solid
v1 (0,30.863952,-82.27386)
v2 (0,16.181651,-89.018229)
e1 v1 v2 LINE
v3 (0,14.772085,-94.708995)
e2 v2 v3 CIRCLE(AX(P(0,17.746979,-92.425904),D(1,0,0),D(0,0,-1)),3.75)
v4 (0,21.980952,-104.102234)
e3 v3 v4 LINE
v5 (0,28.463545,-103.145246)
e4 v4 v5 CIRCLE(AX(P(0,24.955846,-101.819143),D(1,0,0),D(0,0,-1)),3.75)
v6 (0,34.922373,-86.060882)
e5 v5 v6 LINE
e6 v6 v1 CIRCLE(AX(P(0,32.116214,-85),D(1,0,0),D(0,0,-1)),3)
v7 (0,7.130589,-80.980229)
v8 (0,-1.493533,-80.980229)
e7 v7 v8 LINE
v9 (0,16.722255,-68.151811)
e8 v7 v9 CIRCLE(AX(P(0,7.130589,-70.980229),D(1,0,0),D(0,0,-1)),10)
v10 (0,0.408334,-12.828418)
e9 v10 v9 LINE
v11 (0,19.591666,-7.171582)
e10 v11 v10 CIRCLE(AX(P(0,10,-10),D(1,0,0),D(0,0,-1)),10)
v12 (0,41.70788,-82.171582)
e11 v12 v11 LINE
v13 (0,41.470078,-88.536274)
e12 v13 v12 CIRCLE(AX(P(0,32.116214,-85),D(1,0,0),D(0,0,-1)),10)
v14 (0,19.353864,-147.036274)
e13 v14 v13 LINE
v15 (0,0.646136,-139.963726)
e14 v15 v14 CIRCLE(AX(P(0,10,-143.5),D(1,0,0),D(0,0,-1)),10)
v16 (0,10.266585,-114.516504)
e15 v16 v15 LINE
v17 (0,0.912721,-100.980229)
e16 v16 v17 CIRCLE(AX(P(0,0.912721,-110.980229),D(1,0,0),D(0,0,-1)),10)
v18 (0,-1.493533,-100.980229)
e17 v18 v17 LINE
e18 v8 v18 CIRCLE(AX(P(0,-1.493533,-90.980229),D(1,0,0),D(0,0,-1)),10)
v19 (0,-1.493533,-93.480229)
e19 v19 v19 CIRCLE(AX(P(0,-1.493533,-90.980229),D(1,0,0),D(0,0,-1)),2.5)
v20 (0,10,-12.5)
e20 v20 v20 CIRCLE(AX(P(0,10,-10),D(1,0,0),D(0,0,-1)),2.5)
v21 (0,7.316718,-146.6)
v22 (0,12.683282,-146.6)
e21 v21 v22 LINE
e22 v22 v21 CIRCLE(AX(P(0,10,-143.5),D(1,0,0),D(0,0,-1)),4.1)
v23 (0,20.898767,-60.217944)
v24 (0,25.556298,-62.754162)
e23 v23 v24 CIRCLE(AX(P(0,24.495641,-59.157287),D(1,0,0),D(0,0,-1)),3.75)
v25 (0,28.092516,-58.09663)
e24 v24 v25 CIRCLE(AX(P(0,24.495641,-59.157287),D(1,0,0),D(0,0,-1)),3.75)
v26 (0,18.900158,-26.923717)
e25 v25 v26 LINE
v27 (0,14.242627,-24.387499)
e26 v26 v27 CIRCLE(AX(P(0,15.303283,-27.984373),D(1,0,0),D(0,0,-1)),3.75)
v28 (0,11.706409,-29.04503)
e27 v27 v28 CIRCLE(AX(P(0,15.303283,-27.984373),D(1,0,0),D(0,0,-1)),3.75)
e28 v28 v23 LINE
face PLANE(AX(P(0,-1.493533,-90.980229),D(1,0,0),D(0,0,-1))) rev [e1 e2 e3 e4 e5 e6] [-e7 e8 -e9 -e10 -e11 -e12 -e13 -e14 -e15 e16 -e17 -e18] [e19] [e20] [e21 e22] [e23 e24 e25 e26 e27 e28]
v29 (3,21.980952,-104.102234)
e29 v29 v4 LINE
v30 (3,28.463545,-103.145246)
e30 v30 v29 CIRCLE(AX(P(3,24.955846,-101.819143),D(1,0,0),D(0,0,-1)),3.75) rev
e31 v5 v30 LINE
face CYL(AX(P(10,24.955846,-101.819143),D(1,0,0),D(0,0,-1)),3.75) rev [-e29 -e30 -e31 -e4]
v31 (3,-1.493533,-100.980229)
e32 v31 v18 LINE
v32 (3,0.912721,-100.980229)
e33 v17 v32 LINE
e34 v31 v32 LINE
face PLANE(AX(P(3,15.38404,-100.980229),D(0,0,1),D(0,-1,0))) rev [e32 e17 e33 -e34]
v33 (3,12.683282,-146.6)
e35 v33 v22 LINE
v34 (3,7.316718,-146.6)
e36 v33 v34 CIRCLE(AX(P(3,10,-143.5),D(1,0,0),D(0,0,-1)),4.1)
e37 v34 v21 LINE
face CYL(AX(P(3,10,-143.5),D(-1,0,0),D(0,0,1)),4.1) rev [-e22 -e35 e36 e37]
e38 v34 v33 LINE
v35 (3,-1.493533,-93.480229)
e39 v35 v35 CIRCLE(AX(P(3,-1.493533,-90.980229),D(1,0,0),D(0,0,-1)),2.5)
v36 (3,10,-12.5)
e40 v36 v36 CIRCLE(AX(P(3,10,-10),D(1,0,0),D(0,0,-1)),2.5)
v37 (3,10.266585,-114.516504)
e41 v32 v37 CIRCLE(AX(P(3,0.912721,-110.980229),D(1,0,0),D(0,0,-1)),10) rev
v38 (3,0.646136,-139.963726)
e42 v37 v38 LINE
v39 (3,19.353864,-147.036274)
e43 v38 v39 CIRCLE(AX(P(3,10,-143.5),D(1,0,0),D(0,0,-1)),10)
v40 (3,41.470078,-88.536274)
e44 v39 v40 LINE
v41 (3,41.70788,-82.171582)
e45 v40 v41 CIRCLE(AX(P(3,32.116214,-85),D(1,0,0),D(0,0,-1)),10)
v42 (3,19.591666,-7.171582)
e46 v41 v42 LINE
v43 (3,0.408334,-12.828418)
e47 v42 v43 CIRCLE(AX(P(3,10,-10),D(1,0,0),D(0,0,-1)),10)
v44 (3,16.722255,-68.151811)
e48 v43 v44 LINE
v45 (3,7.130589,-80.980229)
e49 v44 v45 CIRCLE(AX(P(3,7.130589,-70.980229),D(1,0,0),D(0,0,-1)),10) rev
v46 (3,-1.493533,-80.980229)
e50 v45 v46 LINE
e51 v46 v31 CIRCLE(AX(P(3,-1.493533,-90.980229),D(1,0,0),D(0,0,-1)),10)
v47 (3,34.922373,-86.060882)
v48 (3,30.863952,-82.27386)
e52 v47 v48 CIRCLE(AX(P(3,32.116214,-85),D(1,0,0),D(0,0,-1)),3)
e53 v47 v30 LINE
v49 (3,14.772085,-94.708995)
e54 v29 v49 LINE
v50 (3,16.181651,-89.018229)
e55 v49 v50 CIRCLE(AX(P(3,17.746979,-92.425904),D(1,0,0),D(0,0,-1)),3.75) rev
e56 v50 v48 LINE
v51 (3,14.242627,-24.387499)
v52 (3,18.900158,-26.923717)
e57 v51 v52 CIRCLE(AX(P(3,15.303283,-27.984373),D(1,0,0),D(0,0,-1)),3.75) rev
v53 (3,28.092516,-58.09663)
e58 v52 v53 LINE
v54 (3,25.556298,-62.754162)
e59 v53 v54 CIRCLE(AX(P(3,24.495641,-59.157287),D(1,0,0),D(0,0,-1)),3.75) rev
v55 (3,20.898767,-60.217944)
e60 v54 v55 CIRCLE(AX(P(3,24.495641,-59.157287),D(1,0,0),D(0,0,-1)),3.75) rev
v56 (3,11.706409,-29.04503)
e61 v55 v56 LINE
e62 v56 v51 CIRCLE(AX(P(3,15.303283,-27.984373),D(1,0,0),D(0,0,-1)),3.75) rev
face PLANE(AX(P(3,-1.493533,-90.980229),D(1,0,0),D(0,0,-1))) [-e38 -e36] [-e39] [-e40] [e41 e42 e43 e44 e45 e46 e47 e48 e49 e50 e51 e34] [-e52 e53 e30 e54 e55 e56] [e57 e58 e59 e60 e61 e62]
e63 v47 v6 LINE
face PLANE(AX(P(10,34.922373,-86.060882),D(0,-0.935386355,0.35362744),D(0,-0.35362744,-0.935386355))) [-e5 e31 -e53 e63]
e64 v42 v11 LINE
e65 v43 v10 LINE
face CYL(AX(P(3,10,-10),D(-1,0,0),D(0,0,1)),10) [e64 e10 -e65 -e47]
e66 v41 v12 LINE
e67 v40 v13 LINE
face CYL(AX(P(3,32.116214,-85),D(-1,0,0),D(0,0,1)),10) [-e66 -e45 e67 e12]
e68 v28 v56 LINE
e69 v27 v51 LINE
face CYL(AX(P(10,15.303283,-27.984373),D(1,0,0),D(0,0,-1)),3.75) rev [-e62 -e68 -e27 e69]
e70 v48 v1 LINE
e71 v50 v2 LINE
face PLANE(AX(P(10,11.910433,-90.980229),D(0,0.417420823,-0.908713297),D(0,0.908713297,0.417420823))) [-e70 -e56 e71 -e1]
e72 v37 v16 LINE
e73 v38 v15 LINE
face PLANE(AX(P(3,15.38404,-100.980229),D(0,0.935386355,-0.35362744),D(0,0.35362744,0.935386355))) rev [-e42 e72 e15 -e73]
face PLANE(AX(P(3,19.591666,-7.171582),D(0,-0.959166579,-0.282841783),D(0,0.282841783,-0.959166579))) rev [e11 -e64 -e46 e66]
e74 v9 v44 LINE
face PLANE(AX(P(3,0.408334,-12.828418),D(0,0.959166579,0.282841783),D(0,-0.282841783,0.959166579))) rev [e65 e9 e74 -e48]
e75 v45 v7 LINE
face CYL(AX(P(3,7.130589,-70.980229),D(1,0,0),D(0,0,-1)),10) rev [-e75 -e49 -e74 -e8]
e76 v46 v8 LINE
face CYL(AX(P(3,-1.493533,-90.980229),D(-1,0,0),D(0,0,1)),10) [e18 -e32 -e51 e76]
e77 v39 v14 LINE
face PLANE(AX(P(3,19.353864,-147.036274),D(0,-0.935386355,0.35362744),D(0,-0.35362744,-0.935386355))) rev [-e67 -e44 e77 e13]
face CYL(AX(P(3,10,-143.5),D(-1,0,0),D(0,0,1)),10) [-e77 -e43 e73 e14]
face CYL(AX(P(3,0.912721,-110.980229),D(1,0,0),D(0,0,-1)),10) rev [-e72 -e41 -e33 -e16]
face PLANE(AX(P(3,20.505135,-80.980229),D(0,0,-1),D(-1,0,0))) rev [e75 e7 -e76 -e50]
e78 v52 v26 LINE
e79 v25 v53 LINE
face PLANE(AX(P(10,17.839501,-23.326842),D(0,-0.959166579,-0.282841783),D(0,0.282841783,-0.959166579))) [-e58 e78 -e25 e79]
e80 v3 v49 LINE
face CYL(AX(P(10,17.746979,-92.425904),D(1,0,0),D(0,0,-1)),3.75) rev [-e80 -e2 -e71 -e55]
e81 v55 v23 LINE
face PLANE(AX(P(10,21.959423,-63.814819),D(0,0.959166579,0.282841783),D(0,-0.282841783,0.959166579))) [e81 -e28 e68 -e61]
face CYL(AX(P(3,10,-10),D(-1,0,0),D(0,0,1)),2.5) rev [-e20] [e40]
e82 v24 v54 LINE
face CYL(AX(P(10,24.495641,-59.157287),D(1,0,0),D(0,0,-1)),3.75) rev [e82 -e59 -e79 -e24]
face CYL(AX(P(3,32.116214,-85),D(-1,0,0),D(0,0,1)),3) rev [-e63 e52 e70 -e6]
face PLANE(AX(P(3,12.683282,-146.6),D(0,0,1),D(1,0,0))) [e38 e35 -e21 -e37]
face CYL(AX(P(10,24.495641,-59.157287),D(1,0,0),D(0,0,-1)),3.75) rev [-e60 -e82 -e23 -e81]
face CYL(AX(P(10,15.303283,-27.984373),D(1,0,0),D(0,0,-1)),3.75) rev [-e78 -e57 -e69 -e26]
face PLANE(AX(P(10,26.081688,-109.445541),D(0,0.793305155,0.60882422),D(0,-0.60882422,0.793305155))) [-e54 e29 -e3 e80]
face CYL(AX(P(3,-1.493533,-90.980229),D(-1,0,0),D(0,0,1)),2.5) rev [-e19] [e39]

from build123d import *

# Parameters (mm, degrees)
SKETCH3_R           = 3
SKETCH3_R_2         = 2.5
BOSS_EXTRUDE2_DEPTH = 3
FILLET1_R           = 10
CUT_EXTRUDE1_DEPTH  = 10
FILLET2_R           = 3.75


with BuildPart() as part:
    # Sketch3 → Boss-Extrude2 (new body)
    with BuildSketch(Plane(origin=(0, 0, 0), x_dir=(0, 0, -1), z_dir=(1, 0, 0))):
        with BuildLine():
            Line((7.171582169, 19.591665787), (82.171582169, 41.707880218))
            ThreePointArc((82.171582169, 41.707880218), (85.373366716, 42.109241865), (88.536274395, 41.470077986))
            Line((88.536274395, 41.470077986), (147.036274395, 19.353863555))
            ThreePointArc((147.036274395, 19.353863555), (152.853863555, 6.463725605), (139.963725605, 0.646136445))
            Line((139.963725605, 0.646136445), (100.980229255, 15.384040113))
            Line((100.980229255, 15.384040113), (100.980229255, -1.493532665))
            ThreePointArc((100.980229255, -1.493532665), (90.980229255, -11.493532665), (80.980229255, -1.493532665))
            Line((80.980229255, -1.493532665), (80.980229255, 20.505135217))
            Line((80.980229255, 20.505135217), (12.828417831, 0.408334213))
            ThreePointArc((12.828417831, 0.408334213), (0.408334213, 7.171582169), (7.171582169, 19.591665787))
        make_face()
        with Locations((85, 32.116214431)):
            Circle(SKETCH3_R, mode=Mode.SUBTRACT)
        with Locations((90.980229255, -1.493532665)):
            Circle(SKETCH3_R_2, mode=Mode.SUBTRACT)
        with Locations((10, 10)):
            Circle(SKETCH3_R_2, mode=Mode.SUBTRACT)
        with BuildLine():
            Line((146.6, 12.683281573), (146.6, 7.316718427))
            ThreePointArc((146.6, 7.316718427), (139.4, 10), (146.6, 12.683281573))
        make_face(mode=Mode.SUBTRACT)
    extrude(amount=BOSS_EXTRUDE2_DEPTH)

    # Fillet1
    fillet1_edges = [part.edges().sort_by_distance(p)[0] for p in [
        (1.5, 20.505135217, -80.980229255),
        (1.5, 15.384040113, -100.980229255),
    ]]
    fillet(fillet1_edges, radius=FILLET1_R)

    # Sketch5 → Cut-Extrude1 (cut)
    with BuildSketch(Plane(origin=(0, 0, 0), x_dir=(0, 0, -1), z_dir=(1, 0, 0))):
        Polygon((23.326841994, 17.839501416), (61.693505144, 29.153172739), (63.814818517, 21.959423399), (25.448155367, 10.645752076), align=None)
        with BuildLine():
            Line((86.060882319, 34.922373497), (109.445541205, 26.081687509))
            Line((109.445541205, 26.081687509), (90.980229255, 11.910433147))
            Line((90.980229255, 11.910433147), (82.273860108, 30.863951963))
            ThreePointArc((82.273860108, 30.863951963), (82.806608326, 34.162927153), (86.060882319, 34.922373497))
        make_face()
    extrude(amount=CUT_EXTRUDE1_DEPTH, mode=Mode.SUBTRACT)

    # Fillet2
    fillet2_edges = [part.edges().sort_by_distance(p)[0] for p in [
        (1.5, 11.910433147, -90.980229255),
        (1.5, 26.081687509, -109.445541205),
        (1.5, 29.153172739, -61.693505144),
        (1.5, 21.959423399, -63.814818517),
        (1.5, 10.645752076, -25.448155367),
        (1.5, 17.839501416, -23.326841994),
    ]]
    fillet(fillet2_edges, radius=FILLET2_R - 0.0001)  # a hair under: the kernel refuses the full size


solid = part.part
